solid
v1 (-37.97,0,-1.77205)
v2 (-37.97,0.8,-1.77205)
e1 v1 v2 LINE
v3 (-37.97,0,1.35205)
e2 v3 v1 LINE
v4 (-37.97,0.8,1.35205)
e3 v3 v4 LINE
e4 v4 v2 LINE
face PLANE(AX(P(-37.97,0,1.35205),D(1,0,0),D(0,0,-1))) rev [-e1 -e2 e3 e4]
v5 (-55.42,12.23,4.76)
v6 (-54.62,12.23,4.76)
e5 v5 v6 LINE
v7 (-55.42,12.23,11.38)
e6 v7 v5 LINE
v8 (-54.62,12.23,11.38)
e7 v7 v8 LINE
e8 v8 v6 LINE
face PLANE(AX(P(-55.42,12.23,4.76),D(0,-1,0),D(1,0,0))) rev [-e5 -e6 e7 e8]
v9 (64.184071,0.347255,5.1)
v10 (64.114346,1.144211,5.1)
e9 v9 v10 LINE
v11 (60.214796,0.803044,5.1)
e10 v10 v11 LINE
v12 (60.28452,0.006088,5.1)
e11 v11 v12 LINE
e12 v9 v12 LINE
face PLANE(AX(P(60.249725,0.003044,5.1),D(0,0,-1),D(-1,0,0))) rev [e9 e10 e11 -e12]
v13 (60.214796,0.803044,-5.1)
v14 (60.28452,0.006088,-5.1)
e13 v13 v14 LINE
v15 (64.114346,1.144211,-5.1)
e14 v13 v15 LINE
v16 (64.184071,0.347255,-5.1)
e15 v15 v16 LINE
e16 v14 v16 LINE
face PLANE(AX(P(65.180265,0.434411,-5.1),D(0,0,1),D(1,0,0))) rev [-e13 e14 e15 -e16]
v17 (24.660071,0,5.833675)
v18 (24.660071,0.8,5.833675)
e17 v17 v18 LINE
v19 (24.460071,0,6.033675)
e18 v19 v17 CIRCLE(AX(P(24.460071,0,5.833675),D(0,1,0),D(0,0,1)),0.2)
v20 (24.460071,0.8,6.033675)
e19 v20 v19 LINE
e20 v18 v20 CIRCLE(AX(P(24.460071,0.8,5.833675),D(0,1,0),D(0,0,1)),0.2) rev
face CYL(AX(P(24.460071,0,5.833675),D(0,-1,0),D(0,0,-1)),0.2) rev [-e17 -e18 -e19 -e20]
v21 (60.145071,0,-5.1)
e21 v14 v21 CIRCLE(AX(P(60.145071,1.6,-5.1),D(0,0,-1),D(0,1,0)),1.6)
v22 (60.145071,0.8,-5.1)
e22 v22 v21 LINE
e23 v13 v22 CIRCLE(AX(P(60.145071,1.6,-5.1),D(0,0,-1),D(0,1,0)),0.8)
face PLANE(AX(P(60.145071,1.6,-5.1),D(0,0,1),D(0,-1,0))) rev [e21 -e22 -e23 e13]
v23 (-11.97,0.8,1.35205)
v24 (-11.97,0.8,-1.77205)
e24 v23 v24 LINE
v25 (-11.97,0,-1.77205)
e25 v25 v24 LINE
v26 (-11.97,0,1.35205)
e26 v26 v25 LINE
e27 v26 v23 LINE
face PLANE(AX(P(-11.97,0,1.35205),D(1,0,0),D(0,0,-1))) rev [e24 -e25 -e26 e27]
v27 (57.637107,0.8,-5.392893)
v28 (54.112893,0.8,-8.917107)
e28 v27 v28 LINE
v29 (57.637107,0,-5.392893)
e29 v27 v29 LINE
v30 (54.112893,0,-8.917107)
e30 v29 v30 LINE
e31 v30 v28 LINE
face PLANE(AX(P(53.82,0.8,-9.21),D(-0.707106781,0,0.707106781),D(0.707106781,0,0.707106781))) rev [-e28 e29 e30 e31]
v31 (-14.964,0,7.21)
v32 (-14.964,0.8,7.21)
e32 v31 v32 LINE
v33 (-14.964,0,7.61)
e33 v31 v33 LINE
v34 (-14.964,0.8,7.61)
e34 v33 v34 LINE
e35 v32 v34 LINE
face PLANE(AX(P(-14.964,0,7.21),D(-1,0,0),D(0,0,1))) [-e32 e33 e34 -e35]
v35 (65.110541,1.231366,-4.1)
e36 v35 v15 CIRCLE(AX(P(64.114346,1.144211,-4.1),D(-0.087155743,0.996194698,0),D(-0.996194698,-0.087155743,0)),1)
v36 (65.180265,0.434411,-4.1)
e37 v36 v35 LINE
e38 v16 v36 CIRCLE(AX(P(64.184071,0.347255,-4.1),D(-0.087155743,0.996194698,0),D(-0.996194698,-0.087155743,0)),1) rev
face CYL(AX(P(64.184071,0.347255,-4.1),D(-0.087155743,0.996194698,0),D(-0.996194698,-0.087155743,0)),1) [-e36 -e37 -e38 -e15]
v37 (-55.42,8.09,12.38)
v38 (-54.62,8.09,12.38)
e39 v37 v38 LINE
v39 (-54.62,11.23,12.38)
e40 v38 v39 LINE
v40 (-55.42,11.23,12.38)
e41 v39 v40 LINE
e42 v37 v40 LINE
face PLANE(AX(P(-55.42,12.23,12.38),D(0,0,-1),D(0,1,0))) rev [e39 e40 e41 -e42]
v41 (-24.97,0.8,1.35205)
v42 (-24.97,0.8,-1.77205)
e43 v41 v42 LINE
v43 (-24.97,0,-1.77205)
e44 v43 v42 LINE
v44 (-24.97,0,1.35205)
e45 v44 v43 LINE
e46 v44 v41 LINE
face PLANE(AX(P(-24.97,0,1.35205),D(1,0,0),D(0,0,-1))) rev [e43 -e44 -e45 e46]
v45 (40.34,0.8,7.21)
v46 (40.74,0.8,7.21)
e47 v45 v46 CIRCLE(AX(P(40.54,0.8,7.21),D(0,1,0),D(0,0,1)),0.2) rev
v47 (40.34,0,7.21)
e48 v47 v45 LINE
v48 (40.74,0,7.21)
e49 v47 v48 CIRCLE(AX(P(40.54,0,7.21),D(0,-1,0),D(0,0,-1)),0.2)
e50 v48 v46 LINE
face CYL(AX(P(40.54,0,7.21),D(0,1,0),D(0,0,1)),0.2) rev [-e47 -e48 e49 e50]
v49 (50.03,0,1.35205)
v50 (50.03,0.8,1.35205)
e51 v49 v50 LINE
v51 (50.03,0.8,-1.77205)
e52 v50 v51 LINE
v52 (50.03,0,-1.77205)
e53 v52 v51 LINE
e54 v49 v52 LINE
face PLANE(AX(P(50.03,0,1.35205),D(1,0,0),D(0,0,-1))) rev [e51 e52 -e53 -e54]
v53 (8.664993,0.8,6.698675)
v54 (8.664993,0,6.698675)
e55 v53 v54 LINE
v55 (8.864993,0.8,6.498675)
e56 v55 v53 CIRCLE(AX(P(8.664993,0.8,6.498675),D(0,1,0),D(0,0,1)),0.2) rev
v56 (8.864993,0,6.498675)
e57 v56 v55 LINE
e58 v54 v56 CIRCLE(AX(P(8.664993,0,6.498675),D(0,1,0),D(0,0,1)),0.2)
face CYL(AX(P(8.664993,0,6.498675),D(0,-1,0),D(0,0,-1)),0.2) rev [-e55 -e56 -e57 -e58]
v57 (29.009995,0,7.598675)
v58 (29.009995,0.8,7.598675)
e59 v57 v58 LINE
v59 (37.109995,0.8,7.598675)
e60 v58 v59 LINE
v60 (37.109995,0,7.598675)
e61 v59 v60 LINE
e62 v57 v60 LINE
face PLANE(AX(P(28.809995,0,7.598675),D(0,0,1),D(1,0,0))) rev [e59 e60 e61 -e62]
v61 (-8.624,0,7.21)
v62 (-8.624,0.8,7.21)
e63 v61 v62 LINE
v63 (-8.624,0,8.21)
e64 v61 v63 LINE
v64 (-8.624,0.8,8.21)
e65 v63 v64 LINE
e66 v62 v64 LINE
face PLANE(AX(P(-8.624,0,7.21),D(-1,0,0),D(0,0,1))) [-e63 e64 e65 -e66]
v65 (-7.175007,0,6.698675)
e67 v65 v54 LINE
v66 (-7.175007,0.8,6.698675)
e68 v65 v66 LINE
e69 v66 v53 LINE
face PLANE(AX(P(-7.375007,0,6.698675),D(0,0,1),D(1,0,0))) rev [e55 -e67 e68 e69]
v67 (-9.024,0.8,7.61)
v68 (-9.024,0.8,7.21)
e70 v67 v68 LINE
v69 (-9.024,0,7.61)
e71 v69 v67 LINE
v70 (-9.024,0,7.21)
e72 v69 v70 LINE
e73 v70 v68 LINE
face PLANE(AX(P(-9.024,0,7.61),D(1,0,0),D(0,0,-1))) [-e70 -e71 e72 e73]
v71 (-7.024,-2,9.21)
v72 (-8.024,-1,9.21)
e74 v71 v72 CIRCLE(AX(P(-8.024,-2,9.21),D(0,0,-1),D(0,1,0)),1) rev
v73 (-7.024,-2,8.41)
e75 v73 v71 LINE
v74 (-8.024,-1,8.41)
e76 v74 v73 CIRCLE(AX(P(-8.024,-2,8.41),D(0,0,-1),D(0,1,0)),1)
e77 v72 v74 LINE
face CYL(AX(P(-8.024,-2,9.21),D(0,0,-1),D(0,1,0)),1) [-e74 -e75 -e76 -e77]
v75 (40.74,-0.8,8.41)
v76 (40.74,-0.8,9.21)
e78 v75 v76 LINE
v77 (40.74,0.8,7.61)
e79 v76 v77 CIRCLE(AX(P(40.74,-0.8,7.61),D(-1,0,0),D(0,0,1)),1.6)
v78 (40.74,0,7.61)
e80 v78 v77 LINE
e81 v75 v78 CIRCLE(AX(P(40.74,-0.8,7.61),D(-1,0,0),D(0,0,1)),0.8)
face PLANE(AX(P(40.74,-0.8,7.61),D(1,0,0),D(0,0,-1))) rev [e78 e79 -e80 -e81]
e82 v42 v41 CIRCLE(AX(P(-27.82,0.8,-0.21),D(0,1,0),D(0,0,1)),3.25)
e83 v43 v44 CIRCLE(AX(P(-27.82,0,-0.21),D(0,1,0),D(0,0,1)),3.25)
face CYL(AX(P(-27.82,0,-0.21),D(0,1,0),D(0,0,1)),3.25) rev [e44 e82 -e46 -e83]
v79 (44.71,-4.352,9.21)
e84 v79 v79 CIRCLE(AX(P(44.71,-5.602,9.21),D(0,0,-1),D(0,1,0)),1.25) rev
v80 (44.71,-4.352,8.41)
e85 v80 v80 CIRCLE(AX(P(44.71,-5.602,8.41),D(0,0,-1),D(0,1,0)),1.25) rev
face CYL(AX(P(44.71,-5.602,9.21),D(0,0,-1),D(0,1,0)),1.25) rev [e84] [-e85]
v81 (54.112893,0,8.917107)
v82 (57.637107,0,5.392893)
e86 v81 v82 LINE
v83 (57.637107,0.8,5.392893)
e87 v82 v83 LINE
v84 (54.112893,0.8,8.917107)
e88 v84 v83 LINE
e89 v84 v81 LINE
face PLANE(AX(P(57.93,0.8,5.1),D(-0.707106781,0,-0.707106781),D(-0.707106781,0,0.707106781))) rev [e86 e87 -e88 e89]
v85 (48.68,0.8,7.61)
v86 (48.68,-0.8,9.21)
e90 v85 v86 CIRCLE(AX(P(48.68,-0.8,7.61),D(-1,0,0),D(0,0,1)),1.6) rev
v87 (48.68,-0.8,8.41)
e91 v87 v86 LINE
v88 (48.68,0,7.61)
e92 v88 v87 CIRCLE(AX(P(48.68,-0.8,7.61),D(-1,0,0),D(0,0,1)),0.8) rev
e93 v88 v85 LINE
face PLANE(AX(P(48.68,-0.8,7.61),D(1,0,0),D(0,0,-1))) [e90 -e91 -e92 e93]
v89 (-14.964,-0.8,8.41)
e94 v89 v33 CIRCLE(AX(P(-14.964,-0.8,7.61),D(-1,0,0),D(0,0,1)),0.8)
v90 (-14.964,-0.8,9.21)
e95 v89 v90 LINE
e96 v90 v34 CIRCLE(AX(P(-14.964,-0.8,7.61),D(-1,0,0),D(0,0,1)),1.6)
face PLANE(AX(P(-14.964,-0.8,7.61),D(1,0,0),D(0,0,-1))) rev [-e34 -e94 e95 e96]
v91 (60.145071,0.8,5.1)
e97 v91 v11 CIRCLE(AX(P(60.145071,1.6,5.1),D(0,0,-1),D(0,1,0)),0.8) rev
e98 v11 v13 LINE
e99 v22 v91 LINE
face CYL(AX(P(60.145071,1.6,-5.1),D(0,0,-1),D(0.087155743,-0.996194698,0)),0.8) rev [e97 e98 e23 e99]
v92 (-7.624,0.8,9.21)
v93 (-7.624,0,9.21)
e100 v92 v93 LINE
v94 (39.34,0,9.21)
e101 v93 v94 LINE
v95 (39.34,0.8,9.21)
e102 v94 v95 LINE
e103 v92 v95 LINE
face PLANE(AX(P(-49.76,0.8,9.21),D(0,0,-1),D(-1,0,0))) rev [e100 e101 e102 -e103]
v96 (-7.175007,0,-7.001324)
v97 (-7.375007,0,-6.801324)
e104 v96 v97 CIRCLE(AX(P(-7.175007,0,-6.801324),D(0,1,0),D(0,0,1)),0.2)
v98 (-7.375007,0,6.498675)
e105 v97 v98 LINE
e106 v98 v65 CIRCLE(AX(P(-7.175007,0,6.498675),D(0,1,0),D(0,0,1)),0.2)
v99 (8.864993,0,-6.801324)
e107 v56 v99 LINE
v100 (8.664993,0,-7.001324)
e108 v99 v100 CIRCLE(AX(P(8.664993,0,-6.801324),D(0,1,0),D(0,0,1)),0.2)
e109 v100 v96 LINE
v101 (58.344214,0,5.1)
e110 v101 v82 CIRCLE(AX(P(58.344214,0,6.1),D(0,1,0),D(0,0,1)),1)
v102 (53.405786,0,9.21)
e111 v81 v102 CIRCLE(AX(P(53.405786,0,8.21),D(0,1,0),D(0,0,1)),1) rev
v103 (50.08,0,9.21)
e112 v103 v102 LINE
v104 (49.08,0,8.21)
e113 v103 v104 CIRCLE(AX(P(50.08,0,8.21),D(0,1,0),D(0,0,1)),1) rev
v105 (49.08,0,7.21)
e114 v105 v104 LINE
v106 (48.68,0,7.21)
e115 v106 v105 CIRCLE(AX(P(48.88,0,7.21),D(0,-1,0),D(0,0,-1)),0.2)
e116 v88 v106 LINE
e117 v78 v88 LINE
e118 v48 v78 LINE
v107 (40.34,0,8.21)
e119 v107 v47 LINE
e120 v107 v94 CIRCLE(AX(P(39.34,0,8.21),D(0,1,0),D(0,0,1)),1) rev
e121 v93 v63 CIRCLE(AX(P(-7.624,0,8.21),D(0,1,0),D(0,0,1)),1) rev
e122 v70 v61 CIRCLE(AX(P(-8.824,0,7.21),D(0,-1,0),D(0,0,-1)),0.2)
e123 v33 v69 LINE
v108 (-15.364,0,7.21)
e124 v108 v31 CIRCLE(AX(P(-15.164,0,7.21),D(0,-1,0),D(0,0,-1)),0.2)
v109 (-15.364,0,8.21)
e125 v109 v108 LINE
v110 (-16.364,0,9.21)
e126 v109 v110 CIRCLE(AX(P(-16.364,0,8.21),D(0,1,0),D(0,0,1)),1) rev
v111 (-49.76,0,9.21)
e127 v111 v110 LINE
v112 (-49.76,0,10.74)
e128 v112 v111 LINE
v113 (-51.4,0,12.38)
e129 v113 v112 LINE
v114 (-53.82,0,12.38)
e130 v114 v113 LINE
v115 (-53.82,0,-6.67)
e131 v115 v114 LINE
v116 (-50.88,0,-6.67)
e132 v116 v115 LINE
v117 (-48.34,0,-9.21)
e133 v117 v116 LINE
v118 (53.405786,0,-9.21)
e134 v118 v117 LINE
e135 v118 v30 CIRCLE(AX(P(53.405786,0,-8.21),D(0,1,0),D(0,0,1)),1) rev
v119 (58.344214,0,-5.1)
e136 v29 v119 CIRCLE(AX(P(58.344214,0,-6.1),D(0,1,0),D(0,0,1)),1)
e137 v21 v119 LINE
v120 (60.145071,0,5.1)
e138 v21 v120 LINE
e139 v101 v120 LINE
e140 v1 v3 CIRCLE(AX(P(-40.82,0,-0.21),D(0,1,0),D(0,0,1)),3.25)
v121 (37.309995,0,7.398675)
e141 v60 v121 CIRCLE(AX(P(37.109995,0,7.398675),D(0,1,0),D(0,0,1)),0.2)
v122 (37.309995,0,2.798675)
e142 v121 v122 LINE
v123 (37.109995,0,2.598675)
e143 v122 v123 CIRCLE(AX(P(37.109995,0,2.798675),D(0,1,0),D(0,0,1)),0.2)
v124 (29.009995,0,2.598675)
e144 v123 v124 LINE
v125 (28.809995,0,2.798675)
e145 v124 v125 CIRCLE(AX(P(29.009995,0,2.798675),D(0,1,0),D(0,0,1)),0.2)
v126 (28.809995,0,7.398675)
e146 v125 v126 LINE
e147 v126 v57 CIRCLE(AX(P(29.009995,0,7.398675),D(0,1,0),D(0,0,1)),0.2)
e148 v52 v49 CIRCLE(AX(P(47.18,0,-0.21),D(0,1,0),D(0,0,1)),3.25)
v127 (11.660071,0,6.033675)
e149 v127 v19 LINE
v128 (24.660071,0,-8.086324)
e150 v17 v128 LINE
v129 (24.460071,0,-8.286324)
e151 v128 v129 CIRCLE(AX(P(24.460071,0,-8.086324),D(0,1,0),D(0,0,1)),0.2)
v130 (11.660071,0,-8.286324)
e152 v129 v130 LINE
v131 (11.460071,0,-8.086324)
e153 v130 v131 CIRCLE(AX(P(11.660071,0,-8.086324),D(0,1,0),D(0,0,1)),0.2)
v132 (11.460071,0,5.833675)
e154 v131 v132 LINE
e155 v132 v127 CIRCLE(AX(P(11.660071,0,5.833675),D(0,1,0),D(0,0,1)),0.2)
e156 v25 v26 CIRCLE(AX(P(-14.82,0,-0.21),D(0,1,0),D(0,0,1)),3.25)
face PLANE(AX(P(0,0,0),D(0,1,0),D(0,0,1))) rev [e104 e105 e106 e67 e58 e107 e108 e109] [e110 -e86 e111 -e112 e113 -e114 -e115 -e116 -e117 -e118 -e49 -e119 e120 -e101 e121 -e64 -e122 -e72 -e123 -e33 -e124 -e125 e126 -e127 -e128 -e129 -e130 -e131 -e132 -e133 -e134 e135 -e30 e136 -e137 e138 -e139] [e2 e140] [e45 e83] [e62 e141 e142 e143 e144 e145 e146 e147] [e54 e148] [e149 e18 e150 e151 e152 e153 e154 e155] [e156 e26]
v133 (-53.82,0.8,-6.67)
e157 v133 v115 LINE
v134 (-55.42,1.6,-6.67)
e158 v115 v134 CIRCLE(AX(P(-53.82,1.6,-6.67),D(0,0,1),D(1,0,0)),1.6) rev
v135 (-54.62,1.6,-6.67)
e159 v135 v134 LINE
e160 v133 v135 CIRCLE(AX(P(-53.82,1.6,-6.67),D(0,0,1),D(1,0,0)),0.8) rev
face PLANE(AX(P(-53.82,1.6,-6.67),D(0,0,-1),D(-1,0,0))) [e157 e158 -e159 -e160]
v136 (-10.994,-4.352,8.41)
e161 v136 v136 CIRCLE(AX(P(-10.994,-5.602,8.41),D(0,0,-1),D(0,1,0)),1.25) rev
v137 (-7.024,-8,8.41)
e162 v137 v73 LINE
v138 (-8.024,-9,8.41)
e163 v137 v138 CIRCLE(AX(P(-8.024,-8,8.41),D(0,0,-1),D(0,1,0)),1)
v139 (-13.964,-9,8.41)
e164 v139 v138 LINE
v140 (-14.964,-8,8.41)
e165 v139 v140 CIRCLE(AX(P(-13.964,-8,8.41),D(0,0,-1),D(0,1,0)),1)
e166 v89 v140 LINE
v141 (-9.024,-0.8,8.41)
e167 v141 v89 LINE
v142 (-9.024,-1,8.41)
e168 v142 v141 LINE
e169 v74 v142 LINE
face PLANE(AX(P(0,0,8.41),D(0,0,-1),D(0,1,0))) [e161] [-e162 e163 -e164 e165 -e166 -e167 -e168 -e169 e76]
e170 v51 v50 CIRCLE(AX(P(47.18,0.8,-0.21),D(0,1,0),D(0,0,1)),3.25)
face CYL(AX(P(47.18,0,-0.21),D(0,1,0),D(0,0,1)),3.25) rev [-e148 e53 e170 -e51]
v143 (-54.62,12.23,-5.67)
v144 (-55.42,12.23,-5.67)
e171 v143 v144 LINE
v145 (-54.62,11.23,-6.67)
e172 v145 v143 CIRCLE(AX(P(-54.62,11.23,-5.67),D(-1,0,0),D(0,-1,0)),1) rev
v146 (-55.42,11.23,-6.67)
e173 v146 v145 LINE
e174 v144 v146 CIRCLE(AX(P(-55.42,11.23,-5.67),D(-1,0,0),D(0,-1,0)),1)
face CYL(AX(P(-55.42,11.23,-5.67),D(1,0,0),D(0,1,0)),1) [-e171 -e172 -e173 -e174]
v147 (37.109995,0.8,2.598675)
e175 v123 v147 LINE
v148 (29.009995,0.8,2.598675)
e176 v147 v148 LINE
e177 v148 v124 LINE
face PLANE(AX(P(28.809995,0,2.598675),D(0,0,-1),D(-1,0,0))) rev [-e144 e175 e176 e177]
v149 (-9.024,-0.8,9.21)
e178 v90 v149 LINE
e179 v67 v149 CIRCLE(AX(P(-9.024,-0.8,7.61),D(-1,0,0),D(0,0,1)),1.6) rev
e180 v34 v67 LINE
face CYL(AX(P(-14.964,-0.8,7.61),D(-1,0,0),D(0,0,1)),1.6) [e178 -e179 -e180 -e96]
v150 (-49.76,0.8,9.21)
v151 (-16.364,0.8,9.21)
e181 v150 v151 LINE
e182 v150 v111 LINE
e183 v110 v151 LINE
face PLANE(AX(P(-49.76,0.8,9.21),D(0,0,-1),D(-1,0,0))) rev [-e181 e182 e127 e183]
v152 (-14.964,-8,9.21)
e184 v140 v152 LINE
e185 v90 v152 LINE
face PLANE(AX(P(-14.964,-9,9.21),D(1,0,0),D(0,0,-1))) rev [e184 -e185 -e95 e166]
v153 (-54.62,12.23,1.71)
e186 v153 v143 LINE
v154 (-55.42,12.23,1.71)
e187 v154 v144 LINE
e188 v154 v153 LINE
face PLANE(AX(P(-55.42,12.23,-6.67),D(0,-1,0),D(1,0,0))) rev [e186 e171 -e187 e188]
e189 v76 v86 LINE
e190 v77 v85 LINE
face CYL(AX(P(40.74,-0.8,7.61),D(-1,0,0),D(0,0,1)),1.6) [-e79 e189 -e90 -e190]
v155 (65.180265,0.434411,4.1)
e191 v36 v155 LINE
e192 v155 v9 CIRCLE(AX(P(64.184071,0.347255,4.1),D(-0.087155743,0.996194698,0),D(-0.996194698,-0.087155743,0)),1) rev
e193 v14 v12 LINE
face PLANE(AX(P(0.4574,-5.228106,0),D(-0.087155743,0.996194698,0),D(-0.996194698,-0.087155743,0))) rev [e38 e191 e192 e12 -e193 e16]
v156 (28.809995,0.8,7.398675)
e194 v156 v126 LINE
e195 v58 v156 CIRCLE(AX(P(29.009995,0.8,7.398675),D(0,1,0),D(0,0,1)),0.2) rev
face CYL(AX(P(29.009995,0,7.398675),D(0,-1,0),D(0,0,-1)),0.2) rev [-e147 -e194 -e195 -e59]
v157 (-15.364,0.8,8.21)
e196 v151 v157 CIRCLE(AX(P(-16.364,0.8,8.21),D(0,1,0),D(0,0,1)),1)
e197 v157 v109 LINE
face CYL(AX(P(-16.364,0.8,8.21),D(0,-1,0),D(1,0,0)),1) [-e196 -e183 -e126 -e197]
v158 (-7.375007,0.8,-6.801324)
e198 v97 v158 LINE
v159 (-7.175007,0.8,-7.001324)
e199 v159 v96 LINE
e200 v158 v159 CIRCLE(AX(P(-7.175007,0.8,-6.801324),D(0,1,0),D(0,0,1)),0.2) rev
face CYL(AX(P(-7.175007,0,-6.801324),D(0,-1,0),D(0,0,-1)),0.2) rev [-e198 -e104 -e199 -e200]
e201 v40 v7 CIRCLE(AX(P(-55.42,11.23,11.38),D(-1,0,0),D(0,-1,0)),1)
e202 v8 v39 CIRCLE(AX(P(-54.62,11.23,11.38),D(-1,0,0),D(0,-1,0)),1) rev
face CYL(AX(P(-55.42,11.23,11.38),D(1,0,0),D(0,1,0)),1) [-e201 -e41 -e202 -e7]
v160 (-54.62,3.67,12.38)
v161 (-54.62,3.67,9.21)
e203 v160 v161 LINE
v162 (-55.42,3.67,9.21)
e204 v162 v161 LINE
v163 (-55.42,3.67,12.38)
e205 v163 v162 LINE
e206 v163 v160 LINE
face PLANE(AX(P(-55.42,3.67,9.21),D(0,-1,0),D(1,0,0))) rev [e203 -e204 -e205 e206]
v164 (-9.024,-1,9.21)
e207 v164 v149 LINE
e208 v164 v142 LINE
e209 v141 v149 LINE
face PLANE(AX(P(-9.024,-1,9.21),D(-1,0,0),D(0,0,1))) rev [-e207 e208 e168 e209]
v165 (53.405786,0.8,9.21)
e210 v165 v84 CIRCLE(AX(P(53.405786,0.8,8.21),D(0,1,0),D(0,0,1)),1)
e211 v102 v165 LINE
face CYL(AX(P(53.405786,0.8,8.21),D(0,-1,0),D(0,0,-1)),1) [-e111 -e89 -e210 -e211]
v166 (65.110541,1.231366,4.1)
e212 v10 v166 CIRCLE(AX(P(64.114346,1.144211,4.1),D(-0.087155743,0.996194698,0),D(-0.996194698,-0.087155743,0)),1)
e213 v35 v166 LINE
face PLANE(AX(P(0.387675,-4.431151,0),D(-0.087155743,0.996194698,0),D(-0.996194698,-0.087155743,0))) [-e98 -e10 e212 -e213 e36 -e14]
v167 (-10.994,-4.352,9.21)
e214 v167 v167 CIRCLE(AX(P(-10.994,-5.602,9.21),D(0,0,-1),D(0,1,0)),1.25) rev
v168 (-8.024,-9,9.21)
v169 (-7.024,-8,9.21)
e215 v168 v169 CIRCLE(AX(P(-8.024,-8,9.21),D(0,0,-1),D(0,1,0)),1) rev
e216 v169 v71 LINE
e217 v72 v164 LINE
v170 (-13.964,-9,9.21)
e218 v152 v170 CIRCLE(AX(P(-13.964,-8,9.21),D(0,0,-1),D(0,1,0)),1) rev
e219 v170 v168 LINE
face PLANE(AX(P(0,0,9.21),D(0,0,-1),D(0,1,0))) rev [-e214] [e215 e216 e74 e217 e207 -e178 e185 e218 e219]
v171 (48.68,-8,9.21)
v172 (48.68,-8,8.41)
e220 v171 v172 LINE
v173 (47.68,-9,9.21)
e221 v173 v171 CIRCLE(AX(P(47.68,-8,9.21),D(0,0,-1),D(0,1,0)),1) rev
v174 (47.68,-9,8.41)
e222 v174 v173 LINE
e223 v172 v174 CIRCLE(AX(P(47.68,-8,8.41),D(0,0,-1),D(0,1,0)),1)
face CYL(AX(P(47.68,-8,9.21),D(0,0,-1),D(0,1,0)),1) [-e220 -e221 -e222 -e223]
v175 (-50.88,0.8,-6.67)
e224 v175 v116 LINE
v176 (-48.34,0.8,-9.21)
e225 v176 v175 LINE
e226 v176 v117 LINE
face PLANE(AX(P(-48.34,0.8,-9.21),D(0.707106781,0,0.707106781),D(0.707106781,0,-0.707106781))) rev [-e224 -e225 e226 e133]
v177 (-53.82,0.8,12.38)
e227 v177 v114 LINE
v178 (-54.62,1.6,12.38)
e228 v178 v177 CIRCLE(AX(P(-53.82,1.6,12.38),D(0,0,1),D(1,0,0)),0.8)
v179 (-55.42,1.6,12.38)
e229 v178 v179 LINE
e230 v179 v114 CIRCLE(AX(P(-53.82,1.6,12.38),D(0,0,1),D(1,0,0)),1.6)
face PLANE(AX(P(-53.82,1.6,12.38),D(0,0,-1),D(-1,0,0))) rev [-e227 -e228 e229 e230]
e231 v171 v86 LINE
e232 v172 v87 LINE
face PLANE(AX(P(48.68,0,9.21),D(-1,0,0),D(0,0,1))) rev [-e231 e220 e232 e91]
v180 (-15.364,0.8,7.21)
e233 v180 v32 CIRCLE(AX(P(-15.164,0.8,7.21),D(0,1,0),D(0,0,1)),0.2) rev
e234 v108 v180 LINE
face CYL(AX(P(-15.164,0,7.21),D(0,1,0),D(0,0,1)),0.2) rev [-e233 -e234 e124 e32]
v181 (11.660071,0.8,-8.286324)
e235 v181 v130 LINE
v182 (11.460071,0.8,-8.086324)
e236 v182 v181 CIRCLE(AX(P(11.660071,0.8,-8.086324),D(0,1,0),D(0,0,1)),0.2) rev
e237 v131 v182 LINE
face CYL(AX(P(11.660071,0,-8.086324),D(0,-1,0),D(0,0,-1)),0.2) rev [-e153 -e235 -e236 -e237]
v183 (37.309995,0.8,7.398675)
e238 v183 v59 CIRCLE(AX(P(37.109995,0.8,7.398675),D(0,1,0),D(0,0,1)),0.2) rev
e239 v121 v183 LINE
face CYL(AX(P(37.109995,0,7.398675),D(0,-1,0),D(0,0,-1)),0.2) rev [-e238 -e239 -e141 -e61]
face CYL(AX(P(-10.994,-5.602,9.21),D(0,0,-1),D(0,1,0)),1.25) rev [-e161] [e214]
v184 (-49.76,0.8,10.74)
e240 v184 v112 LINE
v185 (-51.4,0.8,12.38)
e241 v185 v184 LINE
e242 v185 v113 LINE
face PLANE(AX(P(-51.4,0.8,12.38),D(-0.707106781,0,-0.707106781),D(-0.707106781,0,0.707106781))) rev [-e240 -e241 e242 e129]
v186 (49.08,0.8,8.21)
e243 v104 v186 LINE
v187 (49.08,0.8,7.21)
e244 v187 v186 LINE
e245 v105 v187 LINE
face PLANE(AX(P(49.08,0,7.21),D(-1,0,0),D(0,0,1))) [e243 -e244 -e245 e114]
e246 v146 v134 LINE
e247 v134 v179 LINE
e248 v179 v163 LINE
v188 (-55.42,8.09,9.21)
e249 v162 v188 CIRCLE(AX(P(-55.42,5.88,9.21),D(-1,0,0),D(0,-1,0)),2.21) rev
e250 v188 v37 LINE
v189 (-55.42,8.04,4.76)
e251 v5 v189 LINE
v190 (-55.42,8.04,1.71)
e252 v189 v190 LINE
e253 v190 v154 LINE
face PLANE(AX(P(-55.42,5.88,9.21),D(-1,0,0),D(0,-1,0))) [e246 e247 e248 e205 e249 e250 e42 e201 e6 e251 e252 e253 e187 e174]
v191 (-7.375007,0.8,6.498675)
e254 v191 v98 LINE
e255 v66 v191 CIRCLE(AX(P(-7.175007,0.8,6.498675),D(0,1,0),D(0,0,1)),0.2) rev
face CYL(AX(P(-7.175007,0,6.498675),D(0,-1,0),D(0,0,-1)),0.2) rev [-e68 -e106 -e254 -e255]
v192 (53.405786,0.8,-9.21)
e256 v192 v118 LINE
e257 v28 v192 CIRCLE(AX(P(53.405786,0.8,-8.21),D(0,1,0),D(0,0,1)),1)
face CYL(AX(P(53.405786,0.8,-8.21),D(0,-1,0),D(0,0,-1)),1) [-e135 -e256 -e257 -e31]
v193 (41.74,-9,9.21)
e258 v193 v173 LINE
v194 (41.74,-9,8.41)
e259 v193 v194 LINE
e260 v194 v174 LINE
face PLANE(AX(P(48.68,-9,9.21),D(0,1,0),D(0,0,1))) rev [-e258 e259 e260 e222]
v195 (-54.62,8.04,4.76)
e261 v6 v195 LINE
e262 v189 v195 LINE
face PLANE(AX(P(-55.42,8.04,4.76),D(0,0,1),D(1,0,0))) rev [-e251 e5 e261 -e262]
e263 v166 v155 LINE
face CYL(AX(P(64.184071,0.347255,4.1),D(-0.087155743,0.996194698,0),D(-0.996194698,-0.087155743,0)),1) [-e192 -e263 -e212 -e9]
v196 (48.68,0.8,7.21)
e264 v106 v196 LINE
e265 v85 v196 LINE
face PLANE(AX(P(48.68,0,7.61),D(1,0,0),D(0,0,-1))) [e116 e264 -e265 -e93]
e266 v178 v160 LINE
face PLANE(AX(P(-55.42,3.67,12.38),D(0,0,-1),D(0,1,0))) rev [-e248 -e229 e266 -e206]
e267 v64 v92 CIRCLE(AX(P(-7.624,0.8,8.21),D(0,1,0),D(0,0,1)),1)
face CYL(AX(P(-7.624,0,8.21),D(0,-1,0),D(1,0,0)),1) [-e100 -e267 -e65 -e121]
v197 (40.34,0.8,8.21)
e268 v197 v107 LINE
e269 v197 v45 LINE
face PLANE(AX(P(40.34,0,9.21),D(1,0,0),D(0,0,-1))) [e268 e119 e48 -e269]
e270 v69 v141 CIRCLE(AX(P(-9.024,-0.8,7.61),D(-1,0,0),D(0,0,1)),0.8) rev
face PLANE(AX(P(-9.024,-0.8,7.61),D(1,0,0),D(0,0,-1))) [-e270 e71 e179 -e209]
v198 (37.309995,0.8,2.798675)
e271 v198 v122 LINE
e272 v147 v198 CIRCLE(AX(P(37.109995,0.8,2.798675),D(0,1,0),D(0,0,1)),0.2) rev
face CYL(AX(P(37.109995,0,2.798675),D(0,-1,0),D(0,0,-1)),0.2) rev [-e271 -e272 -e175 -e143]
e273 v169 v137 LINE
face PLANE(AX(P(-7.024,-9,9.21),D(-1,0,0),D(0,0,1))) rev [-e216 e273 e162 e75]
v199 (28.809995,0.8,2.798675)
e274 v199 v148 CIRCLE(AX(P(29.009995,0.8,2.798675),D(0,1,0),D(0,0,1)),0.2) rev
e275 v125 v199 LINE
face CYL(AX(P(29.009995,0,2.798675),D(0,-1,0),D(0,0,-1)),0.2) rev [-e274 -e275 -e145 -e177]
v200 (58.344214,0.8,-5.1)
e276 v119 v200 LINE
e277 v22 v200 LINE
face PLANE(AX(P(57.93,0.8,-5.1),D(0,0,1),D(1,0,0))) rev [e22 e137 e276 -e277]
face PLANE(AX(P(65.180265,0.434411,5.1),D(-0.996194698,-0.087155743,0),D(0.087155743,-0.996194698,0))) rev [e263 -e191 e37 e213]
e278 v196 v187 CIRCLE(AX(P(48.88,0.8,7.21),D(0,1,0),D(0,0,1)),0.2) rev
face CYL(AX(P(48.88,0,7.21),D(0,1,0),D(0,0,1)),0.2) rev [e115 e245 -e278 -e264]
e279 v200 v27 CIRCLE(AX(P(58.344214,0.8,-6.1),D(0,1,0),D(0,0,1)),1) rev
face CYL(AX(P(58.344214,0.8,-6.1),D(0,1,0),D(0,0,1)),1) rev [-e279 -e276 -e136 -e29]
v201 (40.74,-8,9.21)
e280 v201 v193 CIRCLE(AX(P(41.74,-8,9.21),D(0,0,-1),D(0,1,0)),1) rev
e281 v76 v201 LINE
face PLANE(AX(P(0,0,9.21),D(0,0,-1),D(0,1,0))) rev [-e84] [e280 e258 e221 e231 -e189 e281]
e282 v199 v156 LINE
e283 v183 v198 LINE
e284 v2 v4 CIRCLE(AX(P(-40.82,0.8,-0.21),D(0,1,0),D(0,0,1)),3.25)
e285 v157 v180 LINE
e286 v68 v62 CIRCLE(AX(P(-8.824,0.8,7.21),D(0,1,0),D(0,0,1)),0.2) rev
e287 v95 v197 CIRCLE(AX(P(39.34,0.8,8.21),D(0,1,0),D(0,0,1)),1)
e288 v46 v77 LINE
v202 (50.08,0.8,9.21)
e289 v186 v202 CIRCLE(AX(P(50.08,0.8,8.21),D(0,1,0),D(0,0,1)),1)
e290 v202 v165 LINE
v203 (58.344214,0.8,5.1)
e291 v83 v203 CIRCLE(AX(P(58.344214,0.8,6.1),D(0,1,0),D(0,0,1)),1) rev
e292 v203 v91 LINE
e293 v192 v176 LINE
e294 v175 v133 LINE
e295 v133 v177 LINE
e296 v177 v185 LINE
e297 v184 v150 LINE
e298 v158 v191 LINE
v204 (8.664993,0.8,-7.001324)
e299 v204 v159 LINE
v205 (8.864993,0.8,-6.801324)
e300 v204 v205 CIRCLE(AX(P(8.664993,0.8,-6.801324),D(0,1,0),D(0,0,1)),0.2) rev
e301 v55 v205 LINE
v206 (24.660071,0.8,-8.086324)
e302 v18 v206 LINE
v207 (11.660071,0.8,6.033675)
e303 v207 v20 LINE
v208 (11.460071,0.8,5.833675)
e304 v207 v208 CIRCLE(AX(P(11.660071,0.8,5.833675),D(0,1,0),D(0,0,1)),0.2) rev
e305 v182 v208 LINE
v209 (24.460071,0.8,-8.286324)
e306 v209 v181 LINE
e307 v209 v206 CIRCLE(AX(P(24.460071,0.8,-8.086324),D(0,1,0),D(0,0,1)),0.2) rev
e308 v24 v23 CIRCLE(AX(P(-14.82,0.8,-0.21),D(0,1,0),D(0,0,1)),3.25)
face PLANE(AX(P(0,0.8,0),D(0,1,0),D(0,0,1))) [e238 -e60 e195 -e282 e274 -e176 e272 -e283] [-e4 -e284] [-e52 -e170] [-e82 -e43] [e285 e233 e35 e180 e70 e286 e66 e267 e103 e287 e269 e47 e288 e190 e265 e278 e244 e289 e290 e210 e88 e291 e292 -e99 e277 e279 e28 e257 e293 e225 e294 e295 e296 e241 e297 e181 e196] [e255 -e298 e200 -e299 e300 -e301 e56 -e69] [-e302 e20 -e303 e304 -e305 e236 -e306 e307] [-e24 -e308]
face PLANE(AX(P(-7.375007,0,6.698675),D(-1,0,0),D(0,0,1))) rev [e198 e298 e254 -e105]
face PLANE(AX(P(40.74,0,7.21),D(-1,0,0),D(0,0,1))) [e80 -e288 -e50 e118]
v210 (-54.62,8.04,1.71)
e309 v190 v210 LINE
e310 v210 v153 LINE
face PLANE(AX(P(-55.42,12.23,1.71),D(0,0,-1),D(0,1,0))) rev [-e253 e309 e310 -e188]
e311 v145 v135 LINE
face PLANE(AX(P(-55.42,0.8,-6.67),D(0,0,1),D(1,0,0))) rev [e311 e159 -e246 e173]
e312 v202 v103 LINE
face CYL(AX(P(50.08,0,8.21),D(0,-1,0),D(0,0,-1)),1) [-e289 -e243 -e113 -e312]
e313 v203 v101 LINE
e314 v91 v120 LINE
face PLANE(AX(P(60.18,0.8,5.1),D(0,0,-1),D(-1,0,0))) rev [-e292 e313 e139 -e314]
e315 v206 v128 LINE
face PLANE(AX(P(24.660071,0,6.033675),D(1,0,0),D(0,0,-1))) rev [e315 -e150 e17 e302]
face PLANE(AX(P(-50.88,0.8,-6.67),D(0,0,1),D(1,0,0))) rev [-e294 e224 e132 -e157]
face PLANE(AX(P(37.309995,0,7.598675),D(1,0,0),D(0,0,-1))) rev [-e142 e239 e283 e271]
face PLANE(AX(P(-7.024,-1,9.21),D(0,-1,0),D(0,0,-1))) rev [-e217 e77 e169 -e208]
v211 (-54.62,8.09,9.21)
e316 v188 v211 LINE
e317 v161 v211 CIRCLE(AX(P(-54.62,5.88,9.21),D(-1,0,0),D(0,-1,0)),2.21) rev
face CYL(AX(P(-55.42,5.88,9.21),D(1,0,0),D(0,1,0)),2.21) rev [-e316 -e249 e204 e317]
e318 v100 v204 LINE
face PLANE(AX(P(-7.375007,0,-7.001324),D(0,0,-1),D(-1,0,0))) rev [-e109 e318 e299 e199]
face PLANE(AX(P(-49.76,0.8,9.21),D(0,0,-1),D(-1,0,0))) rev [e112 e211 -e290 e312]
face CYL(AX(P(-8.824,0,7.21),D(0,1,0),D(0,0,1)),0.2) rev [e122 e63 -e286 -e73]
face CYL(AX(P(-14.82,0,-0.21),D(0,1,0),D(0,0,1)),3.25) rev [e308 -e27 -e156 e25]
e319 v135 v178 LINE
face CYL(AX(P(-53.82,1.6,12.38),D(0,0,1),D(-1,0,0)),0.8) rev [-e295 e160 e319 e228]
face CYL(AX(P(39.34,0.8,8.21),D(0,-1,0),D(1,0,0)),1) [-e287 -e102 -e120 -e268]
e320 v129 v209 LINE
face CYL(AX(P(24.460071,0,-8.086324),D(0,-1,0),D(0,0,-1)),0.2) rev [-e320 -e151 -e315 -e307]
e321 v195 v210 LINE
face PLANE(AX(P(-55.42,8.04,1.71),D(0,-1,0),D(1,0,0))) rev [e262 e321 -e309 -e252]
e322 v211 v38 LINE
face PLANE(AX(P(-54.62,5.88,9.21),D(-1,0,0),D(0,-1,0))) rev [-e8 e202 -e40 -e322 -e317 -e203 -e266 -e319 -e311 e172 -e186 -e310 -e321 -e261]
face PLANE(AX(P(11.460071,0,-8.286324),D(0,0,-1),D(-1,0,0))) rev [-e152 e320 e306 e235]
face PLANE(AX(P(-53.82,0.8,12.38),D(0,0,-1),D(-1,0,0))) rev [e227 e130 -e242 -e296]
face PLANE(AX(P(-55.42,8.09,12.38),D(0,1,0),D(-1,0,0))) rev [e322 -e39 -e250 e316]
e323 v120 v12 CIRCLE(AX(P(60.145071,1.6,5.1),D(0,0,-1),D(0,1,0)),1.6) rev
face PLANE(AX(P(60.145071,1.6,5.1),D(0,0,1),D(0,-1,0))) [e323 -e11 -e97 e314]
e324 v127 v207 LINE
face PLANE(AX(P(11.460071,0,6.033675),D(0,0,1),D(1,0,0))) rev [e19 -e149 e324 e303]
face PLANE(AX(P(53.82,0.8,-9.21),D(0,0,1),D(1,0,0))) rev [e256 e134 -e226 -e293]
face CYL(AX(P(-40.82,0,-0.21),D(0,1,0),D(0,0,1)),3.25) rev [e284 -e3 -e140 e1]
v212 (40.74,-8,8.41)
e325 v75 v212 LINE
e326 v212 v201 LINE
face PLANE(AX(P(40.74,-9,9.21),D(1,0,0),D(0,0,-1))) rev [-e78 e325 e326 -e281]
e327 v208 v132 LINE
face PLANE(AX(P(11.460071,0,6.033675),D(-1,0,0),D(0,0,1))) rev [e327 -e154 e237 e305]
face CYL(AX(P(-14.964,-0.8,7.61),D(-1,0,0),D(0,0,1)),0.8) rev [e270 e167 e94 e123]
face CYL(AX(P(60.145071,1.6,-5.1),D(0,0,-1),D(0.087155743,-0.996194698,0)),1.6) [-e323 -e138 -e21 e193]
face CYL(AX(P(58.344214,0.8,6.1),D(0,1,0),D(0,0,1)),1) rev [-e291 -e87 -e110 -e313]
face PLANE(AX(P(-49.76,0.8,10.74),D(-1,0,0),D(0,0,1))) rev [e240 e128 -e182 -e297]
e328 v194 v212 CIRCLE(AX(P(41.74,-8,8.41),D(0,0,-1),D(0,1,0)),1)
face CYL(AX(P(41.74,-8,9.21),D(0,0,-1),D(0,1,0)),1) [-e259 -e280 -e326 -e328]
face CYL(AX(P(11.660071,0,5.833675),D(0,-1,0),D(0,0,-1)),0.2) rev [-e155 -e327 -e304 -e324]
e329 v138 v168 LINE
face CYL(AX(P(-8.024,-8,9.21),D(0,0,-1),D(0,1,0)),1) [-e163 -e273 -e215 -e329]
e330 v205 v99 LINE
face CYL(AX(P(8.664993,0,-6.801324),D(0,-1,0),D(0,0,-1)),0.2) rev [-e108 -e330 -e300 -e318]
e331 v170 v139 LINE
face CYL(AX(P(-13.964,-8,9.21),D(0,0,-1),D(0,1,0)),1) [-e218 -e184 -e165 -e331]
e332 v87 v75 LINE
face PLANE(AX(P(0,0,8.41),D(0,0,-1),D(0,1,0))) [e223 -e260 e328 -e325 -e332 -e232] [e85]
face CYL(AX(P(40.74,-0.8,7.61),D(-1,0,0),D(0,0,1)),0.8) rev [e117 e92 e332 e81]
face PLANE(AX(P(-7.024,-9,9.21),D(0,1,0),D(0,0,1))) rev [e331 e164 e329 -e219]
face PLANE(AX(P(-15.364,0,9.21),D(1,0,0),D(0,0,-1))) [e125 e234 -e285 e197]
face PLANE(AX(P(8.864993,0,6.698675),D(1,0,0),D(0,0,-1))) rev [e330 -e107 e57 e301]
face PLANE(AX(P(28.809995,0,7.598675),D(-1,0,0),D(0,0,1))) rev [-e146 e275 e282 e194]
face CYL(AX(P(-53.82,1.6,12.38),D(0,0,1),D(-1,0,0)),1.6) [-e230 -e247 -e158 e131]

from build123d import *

# Parameters (mm, degrees)
SM_BASE_FLANGE_1_DEPTH           = 0.8
SKETCH_25_W                      = 16.240000001
SKETCH_25_H                      = 13.699999542
SKETCH_25_W_2                    = 13.2
SKETCH_25_H_2                    = 14.319999239
SKETCH_25_W_3                    = 8.5
SKETCH_25_H_3                    = 5
CUT_EXTRUDE_1_DEPTH              = 62.445396898
SM_EDGE_FLANGE_1_STRIP_CUT_DEPTH = 10.2
SM_EDGE_FLANGE_1_DEPTH           = 10.2
SM_START                         = -0.8
SM_EDGE_FLANGE_2_DEPTH           = 2.8
SM_START_2                       = 0.715504
SM_EDGE_FLANGE_2_2_OUTLINE_W     = 7.94
SM_EDGE_FLANGE_2_2_OUTLINE_H     = 0.8
SM_EDGE_FLANGE_2_2_DEPTH         = 1.284496
SM_START_3                       = -4.3519999
SM_EDGE_FLANGE_2_3_OUTLINE_W     = 7.94
SM_EDGE_FLANGE_2_3_OUTLINE_H     = 0.8
SM_EDGE_FLANGE_2_3_DEPTH         = 3.5519999
SM_START_4                       = -9
SM_EDGE_FLANGE_2_4_OUTLINE_W     = 7.94
SM_EDGE_FLANGE_2_4_OUTLINE_H     = 0.8
SM_EDGE_FLANGE_2_4_DEPTH         = 2.1479999
SM_START_5                       = 40.74
SM_EDGE_FLANGE_2_5_DEPTH         = 7.94
SM_EDGE_FLANGE_2_6_OUTLINE_W     = 2.5000002
SM_EDGE_FLANGE_2_6_OUTLINE_H     = 0.8
SM_EDGE_FLANGE_2_6_DEPTH         = 2.7199999
SM_START_6                       = 45.9600001
SM_EDGE_FLANGE_2_7_OUTLINE_W     = 2.5000002
SM_EDGE_FLANGE_2_7_OUTLINE_H     = 0.8
SM_EDGE_FLANGE_2_7_DEPTH         = 2.7199999
SM_START_7                       = 41.5557556
SM_EDGE_FLANGE_2_8_DEPTH         = 6.2856216
SM_START_8                       = 8.41
SM_EDGE_FLANGE_2_9_DEPTH         = 0.8
SM_START_9                       = -14.964
SM_EDGE_FLANGE_3_OUTLINE_W       = 8
SM_EDGE_FLANGE_3_OUTLINE_H       = 0.8
SM_EDGE_FLANGE_3_DEPTH           = 2.7199999
SM_START_10                      = -9.7439999
SM_EDGE_FLANGE_3_2_OUTLINE_W     = 8
SM_EDGE_FLANGE_3_2_OUTLINE_H     = 0.8
SM_EDGE_FLANGE_3_2_DEPTH         = 2.7199999
SM_START_11                      = -15.364
SM_EDGE_FLANGE_3_3_DEPTH         = 6.74
SM_EDGE_FLANGE_3_4_DEPTH         = 5.94
SM_EDGE_FLANGE_3_5_DEPTH         = 0.8
SM_START_12                      = -1
SM_EDGE_FLANGE_3_6_DEPTH         = 3
SM_EDGE_FLANGE_4_DEPTH           = 19.05
SM_START_13                      = 0.8
SM_EDGE_FLANGE_4_FLAT_DEPTH      = 0.8
FILLET_1_R                       = 1
FILLET_2_R                       = 0.2


with BuildPart() as part:
    # Базовая кромка1: sheet metal written as solids
    # Sketch 1 → Базовая кромка1 (new body)
    with BuildSketch(Plane(origin=(0, 0, 0), x_dir=(1, 0, 0), z_dir=(0, 1, 0))):
        Polygon((53.82, 9.21), (57.93, 5.1), (60.18, 5.1), (60.18, -5.1), (57.93, -5.1), (53.82, -9.21), (-49.76, -9.21), (-49.76, -10.74), (-51.4, -12.38), (-53.82, -12.38), (-53.82, 6.67), (-50.88, 6.67), (-48.34, 9.21), align=None)
    extrude(amount=SM_BASE_FLANGE_1_DEPTH)

    # Эскиз25 → Вырез-Вытянуть1 (cut, through all)
    with BuildSketch(Plane(origin=(0, 0.8, 0), x_dir=(1, 0, 0), z_dir=(0, 1, 0))):
        with Locations((0.744992541, 0.151324571)):
            Rectangle(SKETCH_25_W, SKETCH_25_H)
        with Locations((18.060071277, 1.126324154)):
            Rectangle(SKETCH_25_W_2, SKETCH_25_H_2)
        with Locations((33.059994901, -5.0986752)):
            Rectangle(SKETCH_25_W_3, SKETCH_25_H_3)
        with BuildLine():
            Line((-37.97, -1.352049935), (-37.97, 1.772049935))
            ThreePointArc((-37.97, 1.772049935), (-44.07, 0.21), (-37.97, -1.352049935))
        make_face()
        with BuildLine():
            Line((-24.97, -1.352049935), (-24.97, 1.772049935))
            ThreePointArc((-24.97, 1.772049935), (-31.07, 0.21), (-24.97, -1.352049935))
        make_face()
        with BuildLine():
            Line((-11.97, -1.352049935), (-11.97, 1.772049935))
            ThreePointArc((-11.97, 1.772049935), (-18.07, 0.21), (-11.97, -1.352049935))
        make_face()
        with BuildLine():
            Line((50.03, -1.352049935), (50.03, 1.772049935))
            ThreePointArc((50.03, 1.772049935), (43.93, 0.21), (50.03, -1.352049935))
        make_face()
    extrude(amount=-CUT_EXTRUDE_1_DEPTH, mode=Mode.SUBTRACT)

    # Ребро-кромка1: sheet metal written as solids
    # Ребро-кромка1 strip (on a plane across the edge) → Ребро-кромка1 strip cut (cut)
    with BuildSketch(Plane(origin=(60.18, 0.8, 5.1), x_dir=(-0.08715574274765156, 0.9961946980917461, 0), z_dir=(0, 0, -1))):
        Polygon((-1.212259082, 4.677214117), (-0.793911517, -0.104520434), (0.003044242, -0.03479584), (-0.415303324, 4.746938711), align=None)
    extrude(amount=SM_EDGE_FLANGE_1_STRIP_CUT_DEPTH, mode=Mode.SUBTRACT)

    # Ребро-кромка1 section (on a plane across the edge) → Ребро-кромка1 (add)
    with BuildSketch(Plane(origin=(60.18, 0.8, 5.1), x_dir=(-0.08715574274765156, 0.9961946980917461, 0), z_dir=(0, 0, -1))):
        with BuildLine():
            Line((-0.8, 0.034928754), (-0.8, 4.949374594))
            Line((-0.8, 4.949374594), (0, 4.949374594))
            Line((0, 4.949374594), (0, 0.034928754))
            ThreePointArc((0, 0.034928754), (0.000761423, 3.3244e-05), (0.003044242, -0.03479584))
            Line((0.003044242, -0.03479584), (-0.793911517, -0.104520434))
            ThreePointArc((-0.793911517, -0.104520434), (-0.798477155, -0.034862265), (-0.8, 0.034928754))
        make_face()
    extrude(amount=SM_EDGE_FLANGE_1_DEPTH)

    # Ребро-кромка2: read off the stored shape, not the designer's step
    # Ребро-кромка2 outline → Ребро-кромка2 (cut)
    with BuildSketch(Plane(origin=(0, 0, 0), x_dir=(1, 0, 0), z_dir=(0, 1, 0)).offset(SM_START)):
        with BuildLine():
            Line((48.68, -7.21), (48.68, -9.21))
            Line((48.68, -9.21), (49.08, -9.21))
            Line((49.08, -9.21), (49.08, -7.21))
            ThreePointArc((49.08, -7.21), (48.88, -7.01), (48.68, -7.21))
        make_face()
        with BuildLine():
            Line((40.34, -9.21), (40.74, -9.21))
            Line((40.74, -9.21), (40.74, -7.21))
            ThreePointArc((40.74, -7.21), (40.54, -7.01), (40.34, -7.21))
            Line((40.34, -7.21), (40.34, -9.21))
        make_face()
    extrude(amount=SM_EDGE_FLANGE_2_DEPTH, mode=Mode.SUBTRACT)

    # Sm Edge Flange 2 2 outline → Sm Edge Flange 2 2 (cut)
    with BuildSketch(Plane(origin=(0, 0, 0), x_dir=(1, 0, 0), z_dir=(0, 1, 0)).offset(SM_START_2)):
        with Locations((44.71, -8.81)):
            Rectangle(SM_EDGE_FLANGE_2_2_OUTLINE_W, SM_EDGE_FLANGE_2_2_OUTLINE_H)
    extrude(amount=SM_EDGE_FLANGE_2_2_DEPTH, mode=Mode.SUBTRACT)

    # Sm Edge Flange 2 5 outline → Sm Edge Flange 2 5 (cut)
    with BuildSketch(Plane.YZ.offset(SM_START_5)):
        with BuildLine():
            Line((0, 9.21), (0, 8.995640646))
            ThreePointArc((0, 8.995640646), (0.585640646, 8.41), (0.8, 7.61))
            Line((0.8, 7.61), (0.8, 8.41))
            Line((0.8, 8.41), (0.715504, 8.41))
            Line((0.715504, 8.41), (0.715504, 9.21))
            Line((0.715504, 9.21), (0, 9.21))
        make_face()
    extrude(amount=SM_EDGE_FLANGE_2_5_DEPTH, mode=Mode.SUBTRACT)



with BuildPart() as body_2:
    # Sm Edge Flange 2 3 outline → Sm Edge Flange 2 3 (new body)
    with BuildSketch(Plane(origin=(0, 0, 0), x_dir=(1, 0, 0), z_dir=(0, 1, 0)).offset(SM_START_3)):
        with Locations((44.71, -8.81)):
            Rectangle(SM_EDGE_FLANGE_2_3_OUTLINE_W, SM_EDGE_FLANGE_2_3_OUTLINE_H)
    extrude(amount=SM_EDGE_FLANGE_2_3_DEPTH)


with BuildPart() as body_3:
    # Sm Edge Flange 2 4 outline → Sm Edge Flange 2 4 (new body)
    with BuildSketch(Plane(origin=(0, 0, 0), x_dir=(1, 0, 0), z_dir=(0, 1, 0)).offset(SM_START_4)):
        with Locations((44.71, -8.81)):
            Rectangle(SM_EDGE_FLANGE_2_4_OUTLINE_W, SM_EDGE_FLANGE_2_4_OUTLINE_H)
    extrude(amount=SM_EDGE_FLANGE_2_4_DEPTH)


with BuildPart() as part_1:
    add(part.part)

    add(body_2.part)  # Sm Edge Flange 2 6 merges body 2

    add(body_3.part)  # Sm Edge Flange 2 6 merges body 3
    # Sm Edge Flange 2 6 outline → Sm Edge Flange 2 6 (add)
    with BuildSketch(Plane.YZ.offset(SM_START_5)):
        with Locations((-5.602, 8.81)):
            Rectangle(SM_EDGE_FLANGE_2_6_OUTLINE_W, SM_EDGE_FLANGE_2_6_OUTLINE_H)
        with BuildLine():
            ThreePointArc((0, 8.995640646), (-0.385889528, 9.155481322), (-0.8, 9.21))
            Line((-0.8, 9.21), (-0.8, 8.41))
            ThreePointArc((-0.8, 8.41), (-0.234314575, 8.175685425), (0, 7.61))
            Line((0, 7.61), (0, 8.995640646))
        make_face()
    extrude(amount=SM_EDGE_FLANGE_2_6_DEPTH)

    # Sm Edge Flange 2 7 outline → Sm Edge Flange 2 7 (add)
    with BuildSketch(Plane.YZ.offset(SM_START_6)):
        with Locations((-5.602, 8.81)):
            Rectangle(SM_EDGE_FLANGE_2_7_OUTLINE_W, SM_EDGE_FLANGE_2_7_OUTLINE_H)
        with BuildLine():
            ThreePointArc((0, 8.995640646), (-0.385889528, 9.155481322), (-0.8, 9.21))
            Line((-0.8, 9.21), (-0.8, 8.41))
            ThreePointArc((-0.8, 8.41), (-0.234314575, 8.175685425), (0, 7.61))
            Line((0, 7.61), (0, 8.995640646))
        make_face()
    extrude(amount=SM_EDGE_FLANGE_2_7_DEPTH)

    # Sm Edge Flange 2 8 outline → Sm Edge Flange 2 8 (add)
    with BuildSketch(Plane.YZ.offset(SM_START_7)):
        with BuildLine():
            ThreePointArc((0, 8.995640646), (-0.385889528, 9.155481322), (-0.8, 9.21))
            Line((-0.8, 9.21), (-0.8, 8.41))
            ThreePointArc((-0.8, 8.41), (-0.234314575, 8.175685425), (0, 7.61))
            Line((0, 7.61), (0, 8.995640646))
        make_face()
    extrude(amount=SM_EDGE_FLANGE_2_8_DEPTH)

    # Sm Edge Flange 2 9 outline → Sm Edge Flange 2 9 (add)
    with BuildSketch(Plane.XY.offset(SM_START_8)):
        with BuildLine():
            Line((45.9600001, -6.8520001), (45.96, -5.602))
            ThreePointArc((45.96, -5.602), (45.593883476, -6.485883476), (44.71, -6.852))
            Line((44.71, -6.852), (45.9600001, -6.8520001))
        make_face()
        with BuildLine():
            ThreePointArc((44.71, -4.352), (45.593883476, -4.718116524), (45.96, -5.602))
            Line((45.96, -5.602), (45.9600001, -4.3519999))
            Line((45.9600001, -4.3519999), (44.71, -4.352))
        make_face()
        with BuildLine():
            ThreePointArc((43.46, -5.602), (43.826116524, -4.718116524), (44.71, -4.352))
            Line((44.71, -4.352), (43.4599999, -4.3519999))
            Line((43.4599999, -4.3519999), (43.46, -5.602))
        make_face()
        with BuildLine():
            Line((43.4599999, -6.8520001), (44.71, -6.852))
            ThreePointArc((44.71, -6.852), (43.826116524, -6.485883476), (43.46, -5.602))
            Line((43.46, -5.602), (43.4599999, -6.8520001))
        make_face()
    extrude(amount=SM_EDGE_FLANGE_2_9_DEPTH)

    # Sm Edge Flange 3 3 outline → Sm Edge Flange 3 3 (cut)
    with BuildSketch(Plane.YZ.offset(SM_START_11)):
        with BuildLine():
            Line((0, 9.21), (0, 8.995640646))
            ThreePointArc((0, 8.995640646), (0.585640646, 8.41), (0.8, 7.61))
            Line((0.8, 7.61), (0.8, 9.21))
            Line((0.8, 9.21), (0, 9.21))
        make_face()
    extrude(amount=SM_EDGE_FLANGE_3_3_DEPTH, mode=Mode.SUBTRACT)



with BuildPart() as body_2_2:
    # Ребро-кромка3: read off the stored shape, not the designer's step
    # Ребро-кромка3 outline → Ребро-кромка3 (new body)
    with BuildSketch(Plane.YZ.offset(SM_START_9)):
        with Locations((-5, 8.81)):
            Rectangle(SM_EDGE_FLANGE_3_OUTLINE_W, SM_EDGE_FLANGE_3_OUTLINE_H)
    extrude(amount=SM_EDGE_FLANGE_3_DEPTH)


with BuildPart() as body_3_2:
    # Sm Edge Flange 3 2 outline → Sm Edge Flange 3 2 (new body)
    with BuildSketch(Plane.YZ.offset(SM_START_10)):
        with Locations((-5, 8.81)):
            Rectangle(SM_EDGE_FLANGE_3_2_OUTLINE_W, SM_EDGE_FLANGE_3_2_OUTLINE_H)
    extrude(amount=SM_EDGE_FLANGE_3_2_DEPTH)


with BuildPart() as part_2:
    add(part_1.part)

    add(body_2_2.part)  # Sm Edge Flange 3 4 merges body 2 2

    add(body_3_2.part)  # Sm Edge Flange 3 4 merges body 3 2
    # Sm Edge Flange 3 4 outline → Sm Edge Flange 3 4 (add)
    with BuildSketch(Plane.YZ.offset(SM_START_9)):
        with BuildLine():
            Line((-0.8, 9.21), (-1, 9.21))
            Line((-1, 9.21), (-1, 8.41))
            Line((-1, 8.41), (-0.8, 8.41))
            ThreePointArc((-0.8, 8.41), (-0.234314575, 8.175685425), (0, 7.61))
            Line((0, 7.61), (0, 8.995640646))
            ThreePointArc((0, 8.995640646), (-0.385889528, 9.155481322), (-0.8, 9.21))
        make_face()
    extrude(amount=SM_EDGE_FLANGE_3_4_DEPTH)

    # Sm Edge Flange 3 5 outline → Sm Edge Flange 3 5 (add)
    with BuildSketch(Plane.XY.offset(SM_START_8)):
        with BuildLine():
            Line((-9.7439999, -9), (-9.744, -5.602))
            ThreePointArc((-9.744, -5.602), (-10.994, -6.852), (-12.244, -5.602))
            Line((-12.244, -5.602), (-12.2440001, -9))
            Line((-12.2440001, -9), (-9.7439999, -9))
        make_face()
        with BuildLine():
            ThreePointArc((-12.244, -5.602), (-10.994, -4.352), (-9.744, -5.602))
            Line((-9.744, -5.602), (-9.7439999, -1))
            Line((-9.7439999, -1), (-12.2440001, -1))
            Line((-12.2440001, -1), (-12.244, -5.602))
        make_face()
    extrude(amount=SM_EDGE_FLANGE_3_5_DEPTH)

    # Sm Edge Flange 3 6 outline → Sm Edge Flange 3 6 (cut)
    with BuildSketch(Plane(origin=(0, 0, 0), x_dir=(1, 0, 0), z_dir=(0, 1, 0)).offset(SM_START_12)):
        with BuildLine():
            Line((-14.964, -9), (-14.964, -7.21))
            ThreePointArc((-14.964, -7.21), (-15.164, -7.01), (-15.364, -7.21))
            Line((-15.364, -7.21), (-15.364, -9))
            Line((-15.364, -9), (-14.964, -9))
        make_face()
        with BuildLine():
            Line((-9.024, -7.21), (-9.024, -9))
            Line((-9.024, -9), (-8.624, -9))
            Line((-8.624, -9), (-8.624, -7.21))
            ThreePointArc((-8.624, -7.21), (-8.824, -7.01), (-9.024, -7.21))
        make_face()
    extrude(amount=SM_EDGE_FLANGE_3_6_DEPTH, mode=Mode.SUBTRACT)

    # Ребро-кромка4: sheet metal written as solids
    # Ребро-кромка4 bend section (on a plane across the edge) → Ребро-кромка4 (add)
    with BuildSketch(Plane(origin=(-54.62, 0.8, -6.67), x_dir=(1, 0, 0), z_dir=(0, 0, 1))):
        with BuildLine():
            Line((-0.8, 0.8), (0, 0.8))
            ThreePointArc((0, 0.8), (0.234314575, 0.234314575), (0.8, 0))
            Line((0.8, 0), (0.8, -0.8))
            ThreePointArc((0.8, -0.8), (-0.33137085, -0.33137085), (-0.8, 0.8))
        make_face()
    extrude(amount=SM_EDGE_FLANGE_4_DEPTH)

    # Ребро-кромка4 profile (on flange) → Ребро-кромка4 flat (add)
    with BuildSketch(Plane(origin=(-54.62, 0.8, 0), x_dir=(0, 0, 1), z_dir=(-1, 0, 0)).offset(SM_START_13)):
        with BuildLine():
            Line((-6.67, 11.43), (-6.67, 0.8))
            Line((-6.67, 0.8), (12.38, 0.8))
            Line((12.38, 0.8), (12.38, 2.87))
            Line((12.38, 2.87), (9.21, 2.87))
            ThreePointArc((9.21, 2.87), (7, 5.08), (9.21, 7.29))
            Line((9.21, 7.29), (12.38, 7.29))
            Line((12.38, 7.29), (12.38, 11.43))
            Line((12.38, 11.43), (4.76, 11.43))
            Line((4.76, 11.43), (4.76, 7.24))
            Line((4.76, 7.24), (1.71, 7.24))
            Line((1.71, 7.24), (1.71, 11.43))
            Line((1.71, 11.43), (-6.67, 11.43))
        make_face()
    extrude(amount=-SM_EDGE_FLANGE_4_FLAT_DEPTH)

    # Скругление1
    fillet_1_edges = [part_2.edges().sort_by_distance(p)[0] for p in [
        (65.145403026, 0.83288854, 5.1),
        (65.145403026, 0.83288854, -5.1),
        (40.34, 0.4, 9.21),
        (49.08, 0.4, 9.21),
        (48.68, -9, 8.81),
        (40.74, -9, 8.81),
        (53.82, 0.4, -9.21),
        (57.93, 0.4, -5.1),
        (57.93, 0.4, 5.1),
        (53.82, 0.4, 9.21),
        (-15.364, 0.4, 9.21),
        (-8.624, 0.4, 9.21),
        (-14.964, -9, 8.81),
        (-7.024, -9, 8.81),
        (-7.024, -1, 8.81),
        (-55.02, 12.23, -6.67),
        (-55.02, 12.23, 12.38),
    ]]
    fillet(fillet_1_edges, radius=FILLET_1_R)

    # Скругление2
    fillet_2_edges = [part_2.edges().sort_by_distance(p)[0] for p in [
        (-7.37500746, 0.4, 6.6986752),
        (-7.37500746, 0.4, -7.001324342),
        (8.864992541, 0.4, -7.001324342),
        (8.864992541, 0.4, 6.6986752),
        (11.460071277, 0.4, 6.033675466),
        (11.460071277, 0.4, -8.286323773),
        (24.660071277, 0.4, -8.286323773),
        (24.660071277, 0.4, 6.033675466),
        (37.309994901, 0.4, 2.5986752),
        (37.309994901, 0.4, 7.5986752),
        (28.809994901, 0.4, 7.5986752),
        (28.809994901, 0.4, 2.5986752),
    ]]
    fillet(fillet_2_edges, radius=FILLET_2_R)


solid = part_2.part
